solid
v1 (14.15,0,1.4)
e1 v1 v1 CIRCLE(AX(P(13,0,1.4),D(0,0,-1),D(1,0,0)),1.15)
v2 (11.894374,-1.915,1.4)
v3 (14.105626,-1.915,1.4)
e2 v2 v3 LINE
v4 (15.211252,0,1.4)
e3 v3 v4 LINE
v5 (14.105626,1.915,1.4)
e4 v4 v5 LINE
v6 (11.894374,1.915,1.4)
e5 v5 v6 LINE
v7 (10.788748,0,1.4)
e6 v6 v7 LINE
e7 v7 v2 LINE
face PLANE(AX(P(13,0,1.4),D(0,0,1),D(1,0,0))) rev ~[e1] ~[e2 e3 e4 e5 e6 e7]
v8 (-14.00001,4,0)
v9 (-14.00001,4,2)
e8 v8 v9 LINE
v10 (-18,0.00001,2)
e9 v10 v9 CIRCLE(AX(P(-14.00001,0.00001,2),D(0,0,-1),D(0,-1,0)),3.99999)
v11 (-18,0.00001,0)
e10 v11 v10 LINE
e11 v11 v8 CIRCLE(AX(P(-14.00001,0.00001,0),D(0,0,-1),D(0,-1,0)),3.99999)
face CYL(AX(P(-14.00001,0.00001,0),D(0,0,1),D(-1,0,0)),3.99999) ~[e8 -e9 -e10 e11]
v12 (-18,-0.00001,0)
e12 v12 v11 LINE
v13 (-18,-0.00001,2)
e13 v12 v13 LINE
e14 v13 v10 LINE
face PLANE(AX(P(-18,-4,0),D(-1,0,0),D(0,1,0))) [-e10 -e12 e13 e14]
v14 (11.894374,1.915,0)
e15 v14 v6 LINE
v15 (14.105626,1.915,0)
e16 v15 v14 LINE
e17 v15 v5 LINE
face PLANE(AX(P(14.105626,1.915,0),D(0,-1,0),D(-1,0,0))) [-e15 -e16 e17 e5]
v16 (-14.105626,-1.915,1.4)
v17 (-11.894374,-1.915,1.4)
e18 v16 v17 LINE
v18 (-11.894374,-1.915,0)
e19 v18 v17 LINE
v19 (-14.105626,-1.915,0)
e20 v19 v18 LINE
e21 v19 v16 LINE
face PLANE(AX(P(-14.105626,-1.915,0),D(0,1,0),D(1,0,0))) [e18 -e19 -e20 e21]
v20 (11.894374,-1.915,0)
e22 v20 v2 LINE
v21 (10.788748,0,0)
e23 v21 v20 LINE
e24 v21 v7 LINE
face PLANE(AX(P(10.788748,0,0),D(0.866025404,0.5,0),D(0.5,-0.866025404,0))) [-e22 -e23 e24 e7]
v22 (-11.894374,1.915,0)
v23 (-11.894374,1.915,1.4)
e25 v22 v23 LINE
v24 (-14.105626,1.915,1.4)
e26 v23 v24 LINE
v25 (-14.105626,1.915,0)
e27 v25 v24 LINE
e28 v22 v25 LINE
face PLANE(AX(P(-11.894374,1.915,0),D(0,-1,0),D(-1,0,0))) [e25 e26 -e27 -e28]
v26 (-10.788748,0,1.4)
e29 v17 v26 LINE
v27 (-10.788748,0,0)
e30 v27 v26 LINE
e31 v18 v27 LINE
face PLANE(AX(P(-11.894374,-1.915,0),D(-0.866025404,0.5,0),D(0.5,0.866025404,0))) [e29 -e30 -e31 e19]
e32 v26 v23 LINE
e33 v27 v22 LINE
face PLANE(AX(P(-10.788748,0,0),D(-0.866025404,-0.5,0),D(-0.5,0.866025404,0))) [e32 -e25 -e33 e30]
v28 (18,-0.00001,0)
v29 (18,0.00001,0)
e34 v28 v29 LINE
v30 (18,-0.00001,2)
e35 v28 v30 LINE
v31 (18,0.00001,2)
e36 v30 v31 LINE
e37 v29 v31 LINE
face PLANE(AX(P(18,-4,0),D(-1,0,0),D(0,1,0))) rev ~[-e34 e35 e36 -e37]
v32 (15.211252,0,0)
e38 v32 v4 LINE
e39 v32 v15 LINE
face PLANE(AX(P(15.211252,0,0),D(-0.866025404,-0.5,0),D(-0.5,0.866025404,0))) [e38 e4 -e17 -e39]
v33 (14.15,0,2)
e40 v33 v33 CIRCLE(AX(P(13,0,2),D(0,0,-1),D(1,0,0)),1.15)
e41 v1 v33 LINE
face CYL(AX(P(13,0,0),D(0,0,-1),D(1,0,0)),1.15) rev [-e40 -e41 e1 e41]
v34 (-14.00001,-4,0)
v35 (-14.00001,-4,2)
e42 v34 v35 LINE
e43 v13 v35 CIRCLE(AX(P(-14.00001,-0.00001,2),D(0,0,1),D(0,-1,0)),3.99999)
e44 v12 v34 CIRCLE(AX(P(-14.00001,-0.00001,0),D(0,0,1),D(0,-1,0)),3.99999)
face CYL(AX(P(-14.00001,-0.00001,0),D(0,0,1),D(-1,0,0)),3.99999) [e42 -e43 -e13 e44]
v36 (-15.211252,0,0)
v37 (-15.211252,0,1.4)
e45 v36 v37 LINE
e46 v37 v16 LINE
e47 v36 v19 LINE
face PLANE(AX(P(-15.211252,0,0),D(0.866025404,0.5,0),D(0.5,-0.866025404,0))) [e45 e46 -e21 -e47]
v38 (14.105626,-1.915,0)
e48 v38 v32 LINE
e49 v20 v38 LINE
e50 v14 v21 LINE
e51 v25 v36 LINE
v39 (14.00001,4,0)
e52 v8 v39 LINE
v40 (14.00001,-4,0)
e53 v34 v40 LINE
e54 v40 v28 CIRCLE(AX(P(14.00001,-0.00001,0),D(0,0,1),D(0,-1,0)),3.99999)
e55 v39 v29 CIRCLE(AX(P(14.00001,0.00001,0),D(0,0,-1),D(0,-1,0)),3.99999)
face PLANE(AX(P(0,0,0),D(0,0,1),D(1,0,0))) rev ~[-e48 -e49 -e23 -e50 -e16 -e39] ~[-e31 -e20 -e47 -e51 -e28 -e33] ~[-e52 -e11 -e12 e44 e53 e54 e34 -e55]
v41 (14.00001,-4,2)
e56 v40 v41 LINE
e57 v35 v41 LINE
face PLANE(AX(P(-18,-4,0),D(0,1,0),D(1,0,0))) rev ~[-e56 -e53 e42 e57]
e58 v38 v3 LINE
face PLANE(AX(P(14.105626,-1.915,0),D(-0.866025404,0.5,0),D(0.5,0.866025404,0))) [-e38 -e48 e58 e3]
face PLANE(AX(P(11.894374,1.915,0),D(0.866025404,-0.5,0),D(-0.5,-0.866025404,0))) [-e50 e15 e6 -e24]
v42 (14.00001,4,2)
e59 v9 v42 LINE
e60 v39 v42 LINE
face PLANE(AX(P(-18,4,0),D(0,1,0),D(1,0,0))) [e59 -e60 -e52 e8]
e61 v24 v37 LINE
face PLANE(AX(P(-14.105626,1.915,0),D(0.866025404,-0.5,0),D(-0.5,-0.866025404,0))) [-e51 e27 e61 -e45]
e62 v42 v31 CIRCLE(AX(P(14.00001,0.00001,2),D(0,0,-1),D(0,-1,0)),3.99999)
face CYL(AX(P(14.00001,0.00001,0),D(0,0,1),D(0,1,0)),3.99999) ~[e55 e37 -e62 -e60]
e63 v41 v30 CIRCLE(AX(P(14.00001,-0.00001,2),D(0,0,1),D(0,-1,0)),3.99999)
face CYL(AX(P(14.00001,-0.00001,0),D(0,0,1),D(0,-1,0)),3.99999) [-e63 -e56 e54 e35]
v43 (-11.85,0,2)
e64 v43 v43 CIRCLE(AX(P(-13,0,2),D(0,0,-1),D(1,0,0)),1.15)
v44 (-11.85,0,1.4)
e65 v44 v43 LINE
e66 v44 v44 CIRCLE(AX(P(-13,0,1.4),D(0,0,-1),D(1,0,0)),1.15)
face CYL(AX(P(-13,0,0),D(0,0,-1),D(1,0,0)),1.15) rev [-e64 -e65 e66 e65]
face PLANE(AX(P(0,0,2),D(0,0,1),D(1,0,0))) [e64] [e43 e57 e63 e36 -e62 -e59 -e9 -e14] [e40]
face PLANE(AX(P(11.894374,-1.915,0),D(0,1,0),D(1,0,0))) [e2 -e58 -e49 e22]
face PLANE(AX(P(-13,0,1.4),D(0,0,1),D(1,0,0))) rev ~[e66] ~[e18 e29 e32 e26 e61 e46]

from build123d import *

# Parameters (mm, degrees)
F1_W     = 36
F1_H     = 8
F3_DEPTH = 2
F0_R     = 1.15
F4_DEPTH = 2.001
F5_DEPTH = 1.4
F6_R     = 3.99999


# Not quite as in the source:
# - a fillet or chamfer is up to 0.001 mm smaller than in the source, because OpenCascade refuses the exact size


with BuildPart() as f3:
    # F1 (on Top) → F3 (new body)
    with BuildSketch(Plane.XY):
        Rectangle(F1_W, F1_H)
    extrude(amount=F3_DEPTH)

    # F0 (on Top) → F4 (cut, through all)
    with BuildSketch(Plane.XY):
        with Locations((-13, 0)):
            Circle(F0_R)
        with Locations((13, 0)):
            Circle(F0_R)
    extrude(amount=F4_DEPTH, mode=Mode.SUBTRACT)

    # F2 (on Top) → F5 (cut)
    with BuildSketch(Plane.XY):
        Polygon((-11.8943742345, -1.915), (-10.788748469, 0), (-11.8943742345, 1.915), (-13, 1.915), (-14.1056257655, 1.915), (-15.211251531, 0), (-14.1056257655, -1.915), (-13, -1.915), align=None)
        Polygon((14.1056257655, -1.915), (15.211251531, 0), (14.1056257655, 1.915), (13, 1.915), (11.8943742345, 1.915), (10.788748469, 0), (11.8943742345, -1.915), (13, -1.915), align=None)
    extrude(amount=F5_DEPTH, mode=Mode.SUBTRACT)

    # F6 (radius 4 in the source; OpenCascade refuses exactly that, so slightly less here)
    f6_edges = [f3.edges().sort_by_distance(p)[0] for p in [
        (-18, 4, 1),
        (-18, -4, 1),
        (18, -4, 1),
        (18, 4, 1),
    ]]
    fillet(f6_edges, radius=F6_R)


solid = f3.part
